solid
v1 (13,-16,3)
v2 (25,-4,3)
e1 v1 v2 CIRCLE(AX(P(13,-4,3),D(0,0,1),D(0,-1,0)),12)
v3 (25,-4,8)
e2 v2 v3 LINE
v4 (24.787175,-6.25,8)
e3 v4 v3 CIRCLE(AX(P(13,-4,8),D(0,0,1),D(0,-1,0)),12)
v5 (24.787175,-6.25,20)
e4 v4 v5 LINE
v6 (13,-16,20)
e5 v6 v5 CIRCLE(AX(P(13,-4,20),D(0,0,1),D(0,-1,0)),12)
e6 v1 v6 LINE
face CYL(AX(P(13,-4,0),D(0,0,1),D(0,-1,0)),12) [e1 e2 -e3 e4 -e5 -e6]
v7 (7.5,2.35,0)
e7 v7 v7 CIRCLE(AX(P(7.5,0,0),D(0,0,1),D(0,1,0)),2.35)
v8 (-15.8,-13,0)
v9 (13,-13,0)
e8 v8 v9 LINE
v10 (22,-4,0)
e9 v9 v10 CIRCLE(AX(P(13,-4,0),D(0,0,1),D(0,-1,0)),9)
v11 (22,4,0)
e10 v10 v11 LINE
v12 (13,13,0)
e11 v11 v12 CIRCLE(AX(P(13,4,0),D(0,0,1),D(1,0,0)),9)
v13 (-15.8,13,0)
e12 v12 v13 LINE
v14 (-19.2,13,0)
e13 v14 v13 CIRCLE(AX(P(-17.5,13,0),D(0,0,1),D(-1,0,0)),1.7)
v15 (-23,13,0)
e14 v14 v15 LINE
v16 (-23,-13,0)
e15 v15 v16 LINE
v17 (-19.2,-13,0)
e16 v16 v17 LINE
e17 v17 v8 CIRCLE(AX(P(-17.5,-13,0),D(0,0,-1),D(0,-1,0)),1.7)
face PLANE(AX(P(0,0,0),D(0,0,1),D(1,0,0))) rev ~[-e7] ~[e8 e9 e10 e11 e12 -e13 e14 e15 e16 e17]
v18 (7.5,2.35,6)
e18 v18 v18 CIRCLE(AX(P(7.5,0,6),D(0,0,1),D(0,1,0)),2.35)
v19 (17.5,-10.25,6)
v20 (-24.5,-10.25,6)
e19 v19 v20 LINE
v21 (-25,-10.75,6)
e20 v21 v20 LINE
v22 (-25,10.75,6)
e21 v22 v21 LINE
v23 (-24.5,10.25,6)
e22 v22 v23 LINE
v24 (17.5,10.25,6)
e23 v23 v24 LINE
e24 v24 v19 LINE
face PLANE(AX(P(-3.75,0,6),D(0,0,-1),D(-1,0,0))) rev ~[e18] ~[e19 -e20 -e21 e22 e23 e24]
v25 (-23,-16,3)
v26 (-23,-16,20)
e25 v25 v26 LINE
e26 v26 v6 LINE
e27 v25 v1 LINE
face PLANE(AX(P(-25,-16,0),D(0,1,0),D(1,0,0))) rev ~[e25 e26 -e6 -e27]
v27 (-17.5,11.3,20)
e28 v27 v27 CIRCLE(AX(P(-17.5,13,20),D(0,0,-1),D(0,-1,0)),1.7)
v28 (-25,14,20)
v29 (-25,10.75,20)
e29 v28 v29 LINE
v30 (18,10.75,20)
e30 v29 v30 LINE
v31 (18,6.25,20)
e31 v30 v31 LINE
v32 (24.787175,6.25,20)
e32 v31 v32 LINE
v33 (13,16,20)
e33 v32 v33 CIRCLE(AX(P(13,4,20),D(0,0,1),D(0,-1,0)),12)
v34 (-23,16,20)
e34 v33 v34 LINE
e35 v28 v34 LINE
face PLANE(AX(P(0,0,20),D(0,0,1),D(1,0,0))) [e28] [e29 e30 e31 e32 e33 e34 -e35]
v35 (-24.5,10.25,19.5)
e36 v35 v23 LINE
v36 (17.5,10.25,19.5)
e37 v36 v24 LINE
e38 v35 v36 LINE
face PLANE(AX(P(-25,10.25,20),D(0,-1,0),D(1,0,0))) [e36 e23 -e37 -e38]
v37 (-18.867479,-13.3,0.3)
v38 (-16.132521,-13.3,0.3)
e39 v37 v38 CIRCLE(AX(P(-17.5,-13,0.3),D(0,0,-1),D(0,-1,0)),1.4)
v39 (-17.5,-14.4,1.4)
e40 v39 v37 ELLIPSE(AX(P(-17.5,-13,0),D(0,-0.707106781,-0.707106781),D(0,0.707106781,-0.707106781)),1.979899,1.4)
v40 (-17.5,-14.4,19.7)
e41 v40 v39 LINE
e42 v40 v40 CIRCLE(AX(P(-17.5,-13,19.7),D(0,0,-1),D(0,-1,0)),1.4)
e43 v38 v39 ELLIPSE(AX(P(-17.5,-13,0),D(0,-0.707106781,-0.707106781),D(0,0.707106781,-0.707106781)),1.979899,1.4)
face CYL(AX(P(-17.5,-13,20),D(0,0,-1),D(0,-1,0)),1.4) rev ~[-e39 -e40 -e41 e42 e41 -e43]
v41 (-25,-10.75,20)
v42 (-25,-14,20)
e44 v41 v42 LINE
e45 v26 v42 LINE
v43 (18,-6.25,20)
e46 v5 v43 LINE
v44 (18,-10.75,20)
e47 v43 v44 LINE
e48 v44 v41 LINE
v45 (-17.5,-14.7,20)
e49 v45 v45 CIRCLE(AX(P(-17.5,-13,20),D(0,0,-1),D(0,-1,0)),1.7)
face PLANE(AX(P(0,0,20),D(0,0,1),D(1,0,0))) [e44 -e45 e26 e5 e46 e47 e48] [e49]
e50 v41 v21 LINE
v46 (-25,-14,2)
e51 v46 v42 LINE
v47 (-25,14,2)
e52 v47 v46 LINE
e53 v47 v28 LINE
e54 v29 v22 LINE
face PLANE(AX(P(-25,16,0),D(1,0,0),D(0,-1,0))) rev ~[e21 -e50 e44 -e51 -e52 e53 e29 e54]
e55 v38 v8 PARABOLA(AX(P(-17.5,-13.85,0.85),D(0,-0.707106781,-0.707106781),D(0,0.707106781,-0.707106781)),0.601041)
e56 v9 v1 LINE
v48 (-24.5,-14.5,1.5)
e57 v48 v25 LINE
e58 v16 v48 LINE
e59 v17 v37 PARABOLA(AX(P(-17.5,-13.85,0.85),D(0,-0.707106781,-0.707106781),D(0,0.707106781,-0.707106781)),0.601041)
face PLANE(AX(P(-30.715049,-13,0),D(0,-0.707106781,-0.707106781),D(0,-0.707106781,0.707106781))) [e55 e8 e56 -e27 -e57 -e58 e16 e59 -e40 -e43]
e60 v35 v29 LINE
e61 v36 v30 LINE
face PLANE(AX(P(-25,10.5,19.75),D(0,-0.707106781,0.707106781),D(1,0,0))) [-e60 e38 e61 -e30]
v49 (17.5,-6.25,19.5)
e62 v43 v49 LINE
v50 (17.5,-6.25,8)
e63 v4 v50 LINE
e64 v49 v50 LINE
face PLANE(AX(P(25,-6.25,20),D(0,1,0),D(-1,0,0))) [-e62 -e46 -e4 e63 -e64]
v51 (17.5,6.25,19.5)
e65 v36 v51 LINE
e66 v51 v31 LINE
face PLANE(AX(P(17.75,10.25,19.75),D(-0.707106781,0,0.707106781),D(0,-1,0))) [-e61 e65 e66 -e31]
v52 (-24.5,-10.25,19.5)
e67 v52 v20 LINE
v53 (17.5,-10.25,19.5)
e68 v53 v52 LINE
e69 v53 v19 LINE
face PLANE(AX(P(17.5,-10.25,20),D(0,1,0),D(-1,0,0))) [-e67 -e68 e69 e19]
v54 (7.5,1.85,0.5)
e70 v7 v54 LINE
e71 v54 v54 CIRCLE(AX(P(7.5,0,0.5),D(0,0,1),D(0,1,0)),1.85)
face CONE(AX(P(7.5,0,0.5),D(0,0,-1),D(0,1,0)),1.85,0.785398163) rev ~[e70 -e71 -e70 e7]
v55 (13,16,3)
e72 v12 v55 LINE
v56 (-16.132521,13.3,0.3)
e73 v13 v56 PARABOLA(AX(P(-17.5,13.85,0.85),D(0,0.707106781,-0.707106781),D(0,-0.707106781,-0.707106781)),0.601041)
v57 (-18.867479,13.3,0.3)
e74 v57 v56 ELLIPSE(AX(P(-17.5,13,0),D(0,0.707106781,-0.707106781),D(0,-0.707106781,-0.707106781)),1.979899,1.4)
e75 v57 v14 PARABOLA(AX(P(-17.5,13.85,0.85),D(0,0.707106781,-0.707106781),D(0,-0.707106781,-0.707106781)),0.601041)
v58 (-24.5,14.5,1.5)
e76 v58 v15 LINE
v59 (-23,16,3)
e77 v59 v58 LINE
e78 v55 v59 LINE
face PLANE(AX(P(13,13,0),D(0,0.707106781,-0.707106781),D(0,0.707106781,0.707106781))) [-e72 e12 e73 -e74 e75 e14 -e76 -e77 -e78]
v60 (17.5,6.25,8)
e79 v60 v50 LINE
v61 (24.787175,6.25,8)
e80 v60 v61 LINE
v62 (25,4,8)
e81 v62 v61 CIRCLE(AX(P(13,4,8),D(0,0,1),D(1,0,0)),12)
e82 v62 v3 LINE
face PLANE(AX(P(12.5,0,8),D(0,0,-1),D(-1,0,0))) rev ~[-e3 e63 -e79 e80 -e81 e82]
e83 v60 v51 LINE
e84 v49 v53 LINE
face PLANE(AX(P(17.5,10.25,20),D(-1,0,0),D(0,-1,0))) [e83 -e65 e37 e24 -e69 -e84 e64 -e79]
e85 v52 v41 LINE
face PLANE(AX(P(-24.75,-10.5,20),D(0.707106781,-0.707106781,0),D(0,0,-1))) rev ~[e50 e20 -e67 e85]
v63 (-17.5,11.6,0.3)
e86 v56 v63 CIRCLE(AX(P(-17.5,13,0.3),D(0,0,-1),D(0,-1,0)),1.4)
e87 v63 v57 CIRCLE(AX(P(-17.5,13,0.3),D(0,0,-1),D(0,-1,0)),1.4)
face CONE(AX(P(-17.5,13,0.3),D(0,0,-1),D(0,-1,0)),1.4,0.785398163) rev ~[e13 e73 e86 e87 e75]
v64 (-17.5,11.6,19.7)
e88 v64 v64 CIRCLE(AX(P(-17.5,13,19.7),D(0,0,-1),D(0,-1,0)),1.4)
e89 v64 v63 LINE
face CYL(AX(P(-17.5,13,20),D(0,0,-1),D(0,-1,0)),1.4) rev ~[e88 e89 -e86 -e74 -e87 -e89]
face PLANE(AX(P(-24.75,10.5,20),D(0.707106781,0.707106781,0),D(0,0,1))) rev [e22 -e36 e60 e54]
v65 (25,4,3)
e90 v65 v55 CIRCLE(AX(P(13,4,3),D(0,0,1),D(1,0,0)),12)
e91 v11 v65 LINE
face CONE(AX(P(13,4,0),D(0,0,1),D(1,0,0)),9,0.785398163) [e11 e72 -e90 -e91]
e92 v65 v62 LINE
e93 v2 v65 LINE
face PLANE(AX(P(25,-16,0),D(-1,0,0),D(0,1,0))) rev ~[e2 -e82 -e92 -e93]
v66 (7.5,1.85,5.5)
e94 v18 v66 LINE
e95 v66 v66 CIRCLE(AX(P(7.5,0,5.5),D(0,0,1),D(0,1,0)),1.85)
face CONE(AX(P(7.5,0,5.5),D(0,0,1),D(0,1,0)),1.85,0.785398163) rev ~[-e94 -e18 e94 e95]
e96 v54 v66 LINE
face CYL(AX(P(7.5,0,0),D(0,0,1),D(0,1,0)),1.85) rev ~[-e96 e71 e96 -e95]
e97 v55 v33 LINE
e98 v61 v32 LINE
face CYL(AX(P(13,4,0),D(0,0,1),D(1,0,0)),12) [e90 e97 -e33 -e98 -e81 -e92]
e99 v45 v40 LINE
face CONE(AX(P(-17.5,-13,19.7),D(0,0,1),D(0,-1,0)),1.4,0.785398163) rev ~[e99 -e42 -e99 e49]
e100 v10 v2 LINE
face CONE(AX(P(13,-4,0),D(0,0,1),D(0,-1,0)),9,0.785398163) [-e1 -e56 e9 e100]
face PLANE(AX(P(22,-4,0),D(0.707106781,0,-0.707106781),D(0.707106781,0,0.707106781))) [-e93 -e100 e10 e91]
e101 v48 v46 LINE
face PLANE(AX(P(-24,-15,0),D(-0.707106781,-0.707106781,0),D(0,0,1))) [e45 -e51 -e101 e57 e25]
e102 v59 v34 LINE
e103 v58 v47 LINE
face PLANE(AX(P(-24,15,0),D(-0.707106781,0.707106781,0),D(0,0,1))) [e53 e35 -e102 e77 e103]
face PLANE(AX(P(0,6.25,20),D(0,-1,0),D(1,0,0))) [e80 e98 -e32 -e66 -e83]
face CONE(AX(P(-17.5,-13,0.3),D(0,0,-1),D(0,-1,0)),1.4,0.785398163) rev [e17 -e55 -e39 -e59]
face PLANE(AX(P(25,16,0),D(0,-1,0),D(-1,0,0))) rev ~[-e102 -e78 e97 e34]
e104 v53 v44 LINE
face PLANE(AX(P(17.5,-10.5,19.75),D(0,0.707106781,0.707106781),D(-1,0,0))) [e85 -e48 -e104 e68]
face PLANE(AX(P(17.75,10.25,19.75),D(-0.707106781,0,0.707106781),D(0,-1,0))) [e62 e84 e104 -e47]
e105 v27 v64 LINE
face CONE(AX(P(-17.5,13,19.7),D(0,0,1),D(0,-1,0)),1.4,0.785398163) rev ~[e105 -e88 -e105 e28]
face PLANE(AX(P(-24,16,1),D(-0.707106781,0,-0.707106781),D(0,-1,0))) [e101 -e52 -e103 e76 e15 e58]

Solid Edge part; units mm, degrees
sketch "Sketch1" plane through (0, 0, 0) normal (0, 0, 1) x (1, 0, 0)
  line L0 (-25, -16) -> (25, -16)
  line L1 (25, -16) -> (25, 16)
  line L2 (25, 16) -> (-25, 16)
  line L3 (-25, 16) -> (-25, -16)
  dimension "D1" = 32
  dimension "D2" = 50
extrude "Protrusion1" add sketch "Sketch1" along normal blind 20
sketch "Sketch2" plane through (0, 0, 20) normal (0, 0, 1) x (0, 1, 0)
  line L0 (-10.25, 25) -> (10.25, 25)
  line L1 (10.25, 25) -> (10.25, -17.5)
  line L2 (10.25, -17.5) -> (-10.25, -17.5)
  line L3 (-10.25, -17.5) -> (-10.25, 25)
  dimension "D1" = 20.5
  dimension "D2" = 42.5
extrude "servo_cutout" cut sketch "Sketch2" against normal blind 14
hole "screw_bearing" at (7.5, 0, 0) direction (0, 0, 1) diameter 3.7 depth 30 tip angle 118 start chamfer 0.5 start chamfer angle 45 end chamfer 0.5 end chamfer angle 45
chamfer "Chamfer1" distance 0.5 angle 45 5 edges at (-3.75, -10.25, 20) (-25, -10.25, 13) (17.5, 0, 20) (-3.75, 10.25, 20) (-25, 10.25, 13)
hole "Hole1" at (-17.5, 13, 20) direction (0, 0, -1) diameter 2.8 depth 30 tip angle 118 start chamfer 0.3 start chamfer angle 45 end chamfer 0.3 end chamfer angle 45
hole "Hole2" at (-17.5, -13, 20) direction (0, 0, -1) diameter 2.8 depth 30 tip angle 118 start chamfer 0.3 start chamfer angle 45 end chamfer 0.3 end chamfer angle 45
chamfer "Chamfer2" distance 2 angle 45 3 edges at (-25, 0, 0) (-25, 16, 10) (-25, -16, 10)
fillet "Round1" radius 12 2 edges at (25, 16, 10) (25, -16, 10)
sketch "Sketch3" plane through (0, 0, 20) normal (0, 0, 1) x (0, 1, 0)
  line L0 (-6.25, 0) -> (6.25, 0)
  line L1 (6.25, 0) -> (6.25, -25)
  line L2 (6.25, -25) -> (-6.25, -25)
  line L3 (-6.25, -25) -> (-6.25, 0)
  dimension "D1" = 12.5
  dimension "D2" = 25
extrude "cable_cutout" cut sketch "Sketch3" against normal blind 12
chamfer "bottom_chamfer" distance 3 angle 45 5 edges at (21.4853, 12.4853, 0) (25, 0, 0) (21.4853, -12.4853, 0) (-5, -16, 0) (-5, 16, 0)
properties material "Polypropylene, general purpose"
